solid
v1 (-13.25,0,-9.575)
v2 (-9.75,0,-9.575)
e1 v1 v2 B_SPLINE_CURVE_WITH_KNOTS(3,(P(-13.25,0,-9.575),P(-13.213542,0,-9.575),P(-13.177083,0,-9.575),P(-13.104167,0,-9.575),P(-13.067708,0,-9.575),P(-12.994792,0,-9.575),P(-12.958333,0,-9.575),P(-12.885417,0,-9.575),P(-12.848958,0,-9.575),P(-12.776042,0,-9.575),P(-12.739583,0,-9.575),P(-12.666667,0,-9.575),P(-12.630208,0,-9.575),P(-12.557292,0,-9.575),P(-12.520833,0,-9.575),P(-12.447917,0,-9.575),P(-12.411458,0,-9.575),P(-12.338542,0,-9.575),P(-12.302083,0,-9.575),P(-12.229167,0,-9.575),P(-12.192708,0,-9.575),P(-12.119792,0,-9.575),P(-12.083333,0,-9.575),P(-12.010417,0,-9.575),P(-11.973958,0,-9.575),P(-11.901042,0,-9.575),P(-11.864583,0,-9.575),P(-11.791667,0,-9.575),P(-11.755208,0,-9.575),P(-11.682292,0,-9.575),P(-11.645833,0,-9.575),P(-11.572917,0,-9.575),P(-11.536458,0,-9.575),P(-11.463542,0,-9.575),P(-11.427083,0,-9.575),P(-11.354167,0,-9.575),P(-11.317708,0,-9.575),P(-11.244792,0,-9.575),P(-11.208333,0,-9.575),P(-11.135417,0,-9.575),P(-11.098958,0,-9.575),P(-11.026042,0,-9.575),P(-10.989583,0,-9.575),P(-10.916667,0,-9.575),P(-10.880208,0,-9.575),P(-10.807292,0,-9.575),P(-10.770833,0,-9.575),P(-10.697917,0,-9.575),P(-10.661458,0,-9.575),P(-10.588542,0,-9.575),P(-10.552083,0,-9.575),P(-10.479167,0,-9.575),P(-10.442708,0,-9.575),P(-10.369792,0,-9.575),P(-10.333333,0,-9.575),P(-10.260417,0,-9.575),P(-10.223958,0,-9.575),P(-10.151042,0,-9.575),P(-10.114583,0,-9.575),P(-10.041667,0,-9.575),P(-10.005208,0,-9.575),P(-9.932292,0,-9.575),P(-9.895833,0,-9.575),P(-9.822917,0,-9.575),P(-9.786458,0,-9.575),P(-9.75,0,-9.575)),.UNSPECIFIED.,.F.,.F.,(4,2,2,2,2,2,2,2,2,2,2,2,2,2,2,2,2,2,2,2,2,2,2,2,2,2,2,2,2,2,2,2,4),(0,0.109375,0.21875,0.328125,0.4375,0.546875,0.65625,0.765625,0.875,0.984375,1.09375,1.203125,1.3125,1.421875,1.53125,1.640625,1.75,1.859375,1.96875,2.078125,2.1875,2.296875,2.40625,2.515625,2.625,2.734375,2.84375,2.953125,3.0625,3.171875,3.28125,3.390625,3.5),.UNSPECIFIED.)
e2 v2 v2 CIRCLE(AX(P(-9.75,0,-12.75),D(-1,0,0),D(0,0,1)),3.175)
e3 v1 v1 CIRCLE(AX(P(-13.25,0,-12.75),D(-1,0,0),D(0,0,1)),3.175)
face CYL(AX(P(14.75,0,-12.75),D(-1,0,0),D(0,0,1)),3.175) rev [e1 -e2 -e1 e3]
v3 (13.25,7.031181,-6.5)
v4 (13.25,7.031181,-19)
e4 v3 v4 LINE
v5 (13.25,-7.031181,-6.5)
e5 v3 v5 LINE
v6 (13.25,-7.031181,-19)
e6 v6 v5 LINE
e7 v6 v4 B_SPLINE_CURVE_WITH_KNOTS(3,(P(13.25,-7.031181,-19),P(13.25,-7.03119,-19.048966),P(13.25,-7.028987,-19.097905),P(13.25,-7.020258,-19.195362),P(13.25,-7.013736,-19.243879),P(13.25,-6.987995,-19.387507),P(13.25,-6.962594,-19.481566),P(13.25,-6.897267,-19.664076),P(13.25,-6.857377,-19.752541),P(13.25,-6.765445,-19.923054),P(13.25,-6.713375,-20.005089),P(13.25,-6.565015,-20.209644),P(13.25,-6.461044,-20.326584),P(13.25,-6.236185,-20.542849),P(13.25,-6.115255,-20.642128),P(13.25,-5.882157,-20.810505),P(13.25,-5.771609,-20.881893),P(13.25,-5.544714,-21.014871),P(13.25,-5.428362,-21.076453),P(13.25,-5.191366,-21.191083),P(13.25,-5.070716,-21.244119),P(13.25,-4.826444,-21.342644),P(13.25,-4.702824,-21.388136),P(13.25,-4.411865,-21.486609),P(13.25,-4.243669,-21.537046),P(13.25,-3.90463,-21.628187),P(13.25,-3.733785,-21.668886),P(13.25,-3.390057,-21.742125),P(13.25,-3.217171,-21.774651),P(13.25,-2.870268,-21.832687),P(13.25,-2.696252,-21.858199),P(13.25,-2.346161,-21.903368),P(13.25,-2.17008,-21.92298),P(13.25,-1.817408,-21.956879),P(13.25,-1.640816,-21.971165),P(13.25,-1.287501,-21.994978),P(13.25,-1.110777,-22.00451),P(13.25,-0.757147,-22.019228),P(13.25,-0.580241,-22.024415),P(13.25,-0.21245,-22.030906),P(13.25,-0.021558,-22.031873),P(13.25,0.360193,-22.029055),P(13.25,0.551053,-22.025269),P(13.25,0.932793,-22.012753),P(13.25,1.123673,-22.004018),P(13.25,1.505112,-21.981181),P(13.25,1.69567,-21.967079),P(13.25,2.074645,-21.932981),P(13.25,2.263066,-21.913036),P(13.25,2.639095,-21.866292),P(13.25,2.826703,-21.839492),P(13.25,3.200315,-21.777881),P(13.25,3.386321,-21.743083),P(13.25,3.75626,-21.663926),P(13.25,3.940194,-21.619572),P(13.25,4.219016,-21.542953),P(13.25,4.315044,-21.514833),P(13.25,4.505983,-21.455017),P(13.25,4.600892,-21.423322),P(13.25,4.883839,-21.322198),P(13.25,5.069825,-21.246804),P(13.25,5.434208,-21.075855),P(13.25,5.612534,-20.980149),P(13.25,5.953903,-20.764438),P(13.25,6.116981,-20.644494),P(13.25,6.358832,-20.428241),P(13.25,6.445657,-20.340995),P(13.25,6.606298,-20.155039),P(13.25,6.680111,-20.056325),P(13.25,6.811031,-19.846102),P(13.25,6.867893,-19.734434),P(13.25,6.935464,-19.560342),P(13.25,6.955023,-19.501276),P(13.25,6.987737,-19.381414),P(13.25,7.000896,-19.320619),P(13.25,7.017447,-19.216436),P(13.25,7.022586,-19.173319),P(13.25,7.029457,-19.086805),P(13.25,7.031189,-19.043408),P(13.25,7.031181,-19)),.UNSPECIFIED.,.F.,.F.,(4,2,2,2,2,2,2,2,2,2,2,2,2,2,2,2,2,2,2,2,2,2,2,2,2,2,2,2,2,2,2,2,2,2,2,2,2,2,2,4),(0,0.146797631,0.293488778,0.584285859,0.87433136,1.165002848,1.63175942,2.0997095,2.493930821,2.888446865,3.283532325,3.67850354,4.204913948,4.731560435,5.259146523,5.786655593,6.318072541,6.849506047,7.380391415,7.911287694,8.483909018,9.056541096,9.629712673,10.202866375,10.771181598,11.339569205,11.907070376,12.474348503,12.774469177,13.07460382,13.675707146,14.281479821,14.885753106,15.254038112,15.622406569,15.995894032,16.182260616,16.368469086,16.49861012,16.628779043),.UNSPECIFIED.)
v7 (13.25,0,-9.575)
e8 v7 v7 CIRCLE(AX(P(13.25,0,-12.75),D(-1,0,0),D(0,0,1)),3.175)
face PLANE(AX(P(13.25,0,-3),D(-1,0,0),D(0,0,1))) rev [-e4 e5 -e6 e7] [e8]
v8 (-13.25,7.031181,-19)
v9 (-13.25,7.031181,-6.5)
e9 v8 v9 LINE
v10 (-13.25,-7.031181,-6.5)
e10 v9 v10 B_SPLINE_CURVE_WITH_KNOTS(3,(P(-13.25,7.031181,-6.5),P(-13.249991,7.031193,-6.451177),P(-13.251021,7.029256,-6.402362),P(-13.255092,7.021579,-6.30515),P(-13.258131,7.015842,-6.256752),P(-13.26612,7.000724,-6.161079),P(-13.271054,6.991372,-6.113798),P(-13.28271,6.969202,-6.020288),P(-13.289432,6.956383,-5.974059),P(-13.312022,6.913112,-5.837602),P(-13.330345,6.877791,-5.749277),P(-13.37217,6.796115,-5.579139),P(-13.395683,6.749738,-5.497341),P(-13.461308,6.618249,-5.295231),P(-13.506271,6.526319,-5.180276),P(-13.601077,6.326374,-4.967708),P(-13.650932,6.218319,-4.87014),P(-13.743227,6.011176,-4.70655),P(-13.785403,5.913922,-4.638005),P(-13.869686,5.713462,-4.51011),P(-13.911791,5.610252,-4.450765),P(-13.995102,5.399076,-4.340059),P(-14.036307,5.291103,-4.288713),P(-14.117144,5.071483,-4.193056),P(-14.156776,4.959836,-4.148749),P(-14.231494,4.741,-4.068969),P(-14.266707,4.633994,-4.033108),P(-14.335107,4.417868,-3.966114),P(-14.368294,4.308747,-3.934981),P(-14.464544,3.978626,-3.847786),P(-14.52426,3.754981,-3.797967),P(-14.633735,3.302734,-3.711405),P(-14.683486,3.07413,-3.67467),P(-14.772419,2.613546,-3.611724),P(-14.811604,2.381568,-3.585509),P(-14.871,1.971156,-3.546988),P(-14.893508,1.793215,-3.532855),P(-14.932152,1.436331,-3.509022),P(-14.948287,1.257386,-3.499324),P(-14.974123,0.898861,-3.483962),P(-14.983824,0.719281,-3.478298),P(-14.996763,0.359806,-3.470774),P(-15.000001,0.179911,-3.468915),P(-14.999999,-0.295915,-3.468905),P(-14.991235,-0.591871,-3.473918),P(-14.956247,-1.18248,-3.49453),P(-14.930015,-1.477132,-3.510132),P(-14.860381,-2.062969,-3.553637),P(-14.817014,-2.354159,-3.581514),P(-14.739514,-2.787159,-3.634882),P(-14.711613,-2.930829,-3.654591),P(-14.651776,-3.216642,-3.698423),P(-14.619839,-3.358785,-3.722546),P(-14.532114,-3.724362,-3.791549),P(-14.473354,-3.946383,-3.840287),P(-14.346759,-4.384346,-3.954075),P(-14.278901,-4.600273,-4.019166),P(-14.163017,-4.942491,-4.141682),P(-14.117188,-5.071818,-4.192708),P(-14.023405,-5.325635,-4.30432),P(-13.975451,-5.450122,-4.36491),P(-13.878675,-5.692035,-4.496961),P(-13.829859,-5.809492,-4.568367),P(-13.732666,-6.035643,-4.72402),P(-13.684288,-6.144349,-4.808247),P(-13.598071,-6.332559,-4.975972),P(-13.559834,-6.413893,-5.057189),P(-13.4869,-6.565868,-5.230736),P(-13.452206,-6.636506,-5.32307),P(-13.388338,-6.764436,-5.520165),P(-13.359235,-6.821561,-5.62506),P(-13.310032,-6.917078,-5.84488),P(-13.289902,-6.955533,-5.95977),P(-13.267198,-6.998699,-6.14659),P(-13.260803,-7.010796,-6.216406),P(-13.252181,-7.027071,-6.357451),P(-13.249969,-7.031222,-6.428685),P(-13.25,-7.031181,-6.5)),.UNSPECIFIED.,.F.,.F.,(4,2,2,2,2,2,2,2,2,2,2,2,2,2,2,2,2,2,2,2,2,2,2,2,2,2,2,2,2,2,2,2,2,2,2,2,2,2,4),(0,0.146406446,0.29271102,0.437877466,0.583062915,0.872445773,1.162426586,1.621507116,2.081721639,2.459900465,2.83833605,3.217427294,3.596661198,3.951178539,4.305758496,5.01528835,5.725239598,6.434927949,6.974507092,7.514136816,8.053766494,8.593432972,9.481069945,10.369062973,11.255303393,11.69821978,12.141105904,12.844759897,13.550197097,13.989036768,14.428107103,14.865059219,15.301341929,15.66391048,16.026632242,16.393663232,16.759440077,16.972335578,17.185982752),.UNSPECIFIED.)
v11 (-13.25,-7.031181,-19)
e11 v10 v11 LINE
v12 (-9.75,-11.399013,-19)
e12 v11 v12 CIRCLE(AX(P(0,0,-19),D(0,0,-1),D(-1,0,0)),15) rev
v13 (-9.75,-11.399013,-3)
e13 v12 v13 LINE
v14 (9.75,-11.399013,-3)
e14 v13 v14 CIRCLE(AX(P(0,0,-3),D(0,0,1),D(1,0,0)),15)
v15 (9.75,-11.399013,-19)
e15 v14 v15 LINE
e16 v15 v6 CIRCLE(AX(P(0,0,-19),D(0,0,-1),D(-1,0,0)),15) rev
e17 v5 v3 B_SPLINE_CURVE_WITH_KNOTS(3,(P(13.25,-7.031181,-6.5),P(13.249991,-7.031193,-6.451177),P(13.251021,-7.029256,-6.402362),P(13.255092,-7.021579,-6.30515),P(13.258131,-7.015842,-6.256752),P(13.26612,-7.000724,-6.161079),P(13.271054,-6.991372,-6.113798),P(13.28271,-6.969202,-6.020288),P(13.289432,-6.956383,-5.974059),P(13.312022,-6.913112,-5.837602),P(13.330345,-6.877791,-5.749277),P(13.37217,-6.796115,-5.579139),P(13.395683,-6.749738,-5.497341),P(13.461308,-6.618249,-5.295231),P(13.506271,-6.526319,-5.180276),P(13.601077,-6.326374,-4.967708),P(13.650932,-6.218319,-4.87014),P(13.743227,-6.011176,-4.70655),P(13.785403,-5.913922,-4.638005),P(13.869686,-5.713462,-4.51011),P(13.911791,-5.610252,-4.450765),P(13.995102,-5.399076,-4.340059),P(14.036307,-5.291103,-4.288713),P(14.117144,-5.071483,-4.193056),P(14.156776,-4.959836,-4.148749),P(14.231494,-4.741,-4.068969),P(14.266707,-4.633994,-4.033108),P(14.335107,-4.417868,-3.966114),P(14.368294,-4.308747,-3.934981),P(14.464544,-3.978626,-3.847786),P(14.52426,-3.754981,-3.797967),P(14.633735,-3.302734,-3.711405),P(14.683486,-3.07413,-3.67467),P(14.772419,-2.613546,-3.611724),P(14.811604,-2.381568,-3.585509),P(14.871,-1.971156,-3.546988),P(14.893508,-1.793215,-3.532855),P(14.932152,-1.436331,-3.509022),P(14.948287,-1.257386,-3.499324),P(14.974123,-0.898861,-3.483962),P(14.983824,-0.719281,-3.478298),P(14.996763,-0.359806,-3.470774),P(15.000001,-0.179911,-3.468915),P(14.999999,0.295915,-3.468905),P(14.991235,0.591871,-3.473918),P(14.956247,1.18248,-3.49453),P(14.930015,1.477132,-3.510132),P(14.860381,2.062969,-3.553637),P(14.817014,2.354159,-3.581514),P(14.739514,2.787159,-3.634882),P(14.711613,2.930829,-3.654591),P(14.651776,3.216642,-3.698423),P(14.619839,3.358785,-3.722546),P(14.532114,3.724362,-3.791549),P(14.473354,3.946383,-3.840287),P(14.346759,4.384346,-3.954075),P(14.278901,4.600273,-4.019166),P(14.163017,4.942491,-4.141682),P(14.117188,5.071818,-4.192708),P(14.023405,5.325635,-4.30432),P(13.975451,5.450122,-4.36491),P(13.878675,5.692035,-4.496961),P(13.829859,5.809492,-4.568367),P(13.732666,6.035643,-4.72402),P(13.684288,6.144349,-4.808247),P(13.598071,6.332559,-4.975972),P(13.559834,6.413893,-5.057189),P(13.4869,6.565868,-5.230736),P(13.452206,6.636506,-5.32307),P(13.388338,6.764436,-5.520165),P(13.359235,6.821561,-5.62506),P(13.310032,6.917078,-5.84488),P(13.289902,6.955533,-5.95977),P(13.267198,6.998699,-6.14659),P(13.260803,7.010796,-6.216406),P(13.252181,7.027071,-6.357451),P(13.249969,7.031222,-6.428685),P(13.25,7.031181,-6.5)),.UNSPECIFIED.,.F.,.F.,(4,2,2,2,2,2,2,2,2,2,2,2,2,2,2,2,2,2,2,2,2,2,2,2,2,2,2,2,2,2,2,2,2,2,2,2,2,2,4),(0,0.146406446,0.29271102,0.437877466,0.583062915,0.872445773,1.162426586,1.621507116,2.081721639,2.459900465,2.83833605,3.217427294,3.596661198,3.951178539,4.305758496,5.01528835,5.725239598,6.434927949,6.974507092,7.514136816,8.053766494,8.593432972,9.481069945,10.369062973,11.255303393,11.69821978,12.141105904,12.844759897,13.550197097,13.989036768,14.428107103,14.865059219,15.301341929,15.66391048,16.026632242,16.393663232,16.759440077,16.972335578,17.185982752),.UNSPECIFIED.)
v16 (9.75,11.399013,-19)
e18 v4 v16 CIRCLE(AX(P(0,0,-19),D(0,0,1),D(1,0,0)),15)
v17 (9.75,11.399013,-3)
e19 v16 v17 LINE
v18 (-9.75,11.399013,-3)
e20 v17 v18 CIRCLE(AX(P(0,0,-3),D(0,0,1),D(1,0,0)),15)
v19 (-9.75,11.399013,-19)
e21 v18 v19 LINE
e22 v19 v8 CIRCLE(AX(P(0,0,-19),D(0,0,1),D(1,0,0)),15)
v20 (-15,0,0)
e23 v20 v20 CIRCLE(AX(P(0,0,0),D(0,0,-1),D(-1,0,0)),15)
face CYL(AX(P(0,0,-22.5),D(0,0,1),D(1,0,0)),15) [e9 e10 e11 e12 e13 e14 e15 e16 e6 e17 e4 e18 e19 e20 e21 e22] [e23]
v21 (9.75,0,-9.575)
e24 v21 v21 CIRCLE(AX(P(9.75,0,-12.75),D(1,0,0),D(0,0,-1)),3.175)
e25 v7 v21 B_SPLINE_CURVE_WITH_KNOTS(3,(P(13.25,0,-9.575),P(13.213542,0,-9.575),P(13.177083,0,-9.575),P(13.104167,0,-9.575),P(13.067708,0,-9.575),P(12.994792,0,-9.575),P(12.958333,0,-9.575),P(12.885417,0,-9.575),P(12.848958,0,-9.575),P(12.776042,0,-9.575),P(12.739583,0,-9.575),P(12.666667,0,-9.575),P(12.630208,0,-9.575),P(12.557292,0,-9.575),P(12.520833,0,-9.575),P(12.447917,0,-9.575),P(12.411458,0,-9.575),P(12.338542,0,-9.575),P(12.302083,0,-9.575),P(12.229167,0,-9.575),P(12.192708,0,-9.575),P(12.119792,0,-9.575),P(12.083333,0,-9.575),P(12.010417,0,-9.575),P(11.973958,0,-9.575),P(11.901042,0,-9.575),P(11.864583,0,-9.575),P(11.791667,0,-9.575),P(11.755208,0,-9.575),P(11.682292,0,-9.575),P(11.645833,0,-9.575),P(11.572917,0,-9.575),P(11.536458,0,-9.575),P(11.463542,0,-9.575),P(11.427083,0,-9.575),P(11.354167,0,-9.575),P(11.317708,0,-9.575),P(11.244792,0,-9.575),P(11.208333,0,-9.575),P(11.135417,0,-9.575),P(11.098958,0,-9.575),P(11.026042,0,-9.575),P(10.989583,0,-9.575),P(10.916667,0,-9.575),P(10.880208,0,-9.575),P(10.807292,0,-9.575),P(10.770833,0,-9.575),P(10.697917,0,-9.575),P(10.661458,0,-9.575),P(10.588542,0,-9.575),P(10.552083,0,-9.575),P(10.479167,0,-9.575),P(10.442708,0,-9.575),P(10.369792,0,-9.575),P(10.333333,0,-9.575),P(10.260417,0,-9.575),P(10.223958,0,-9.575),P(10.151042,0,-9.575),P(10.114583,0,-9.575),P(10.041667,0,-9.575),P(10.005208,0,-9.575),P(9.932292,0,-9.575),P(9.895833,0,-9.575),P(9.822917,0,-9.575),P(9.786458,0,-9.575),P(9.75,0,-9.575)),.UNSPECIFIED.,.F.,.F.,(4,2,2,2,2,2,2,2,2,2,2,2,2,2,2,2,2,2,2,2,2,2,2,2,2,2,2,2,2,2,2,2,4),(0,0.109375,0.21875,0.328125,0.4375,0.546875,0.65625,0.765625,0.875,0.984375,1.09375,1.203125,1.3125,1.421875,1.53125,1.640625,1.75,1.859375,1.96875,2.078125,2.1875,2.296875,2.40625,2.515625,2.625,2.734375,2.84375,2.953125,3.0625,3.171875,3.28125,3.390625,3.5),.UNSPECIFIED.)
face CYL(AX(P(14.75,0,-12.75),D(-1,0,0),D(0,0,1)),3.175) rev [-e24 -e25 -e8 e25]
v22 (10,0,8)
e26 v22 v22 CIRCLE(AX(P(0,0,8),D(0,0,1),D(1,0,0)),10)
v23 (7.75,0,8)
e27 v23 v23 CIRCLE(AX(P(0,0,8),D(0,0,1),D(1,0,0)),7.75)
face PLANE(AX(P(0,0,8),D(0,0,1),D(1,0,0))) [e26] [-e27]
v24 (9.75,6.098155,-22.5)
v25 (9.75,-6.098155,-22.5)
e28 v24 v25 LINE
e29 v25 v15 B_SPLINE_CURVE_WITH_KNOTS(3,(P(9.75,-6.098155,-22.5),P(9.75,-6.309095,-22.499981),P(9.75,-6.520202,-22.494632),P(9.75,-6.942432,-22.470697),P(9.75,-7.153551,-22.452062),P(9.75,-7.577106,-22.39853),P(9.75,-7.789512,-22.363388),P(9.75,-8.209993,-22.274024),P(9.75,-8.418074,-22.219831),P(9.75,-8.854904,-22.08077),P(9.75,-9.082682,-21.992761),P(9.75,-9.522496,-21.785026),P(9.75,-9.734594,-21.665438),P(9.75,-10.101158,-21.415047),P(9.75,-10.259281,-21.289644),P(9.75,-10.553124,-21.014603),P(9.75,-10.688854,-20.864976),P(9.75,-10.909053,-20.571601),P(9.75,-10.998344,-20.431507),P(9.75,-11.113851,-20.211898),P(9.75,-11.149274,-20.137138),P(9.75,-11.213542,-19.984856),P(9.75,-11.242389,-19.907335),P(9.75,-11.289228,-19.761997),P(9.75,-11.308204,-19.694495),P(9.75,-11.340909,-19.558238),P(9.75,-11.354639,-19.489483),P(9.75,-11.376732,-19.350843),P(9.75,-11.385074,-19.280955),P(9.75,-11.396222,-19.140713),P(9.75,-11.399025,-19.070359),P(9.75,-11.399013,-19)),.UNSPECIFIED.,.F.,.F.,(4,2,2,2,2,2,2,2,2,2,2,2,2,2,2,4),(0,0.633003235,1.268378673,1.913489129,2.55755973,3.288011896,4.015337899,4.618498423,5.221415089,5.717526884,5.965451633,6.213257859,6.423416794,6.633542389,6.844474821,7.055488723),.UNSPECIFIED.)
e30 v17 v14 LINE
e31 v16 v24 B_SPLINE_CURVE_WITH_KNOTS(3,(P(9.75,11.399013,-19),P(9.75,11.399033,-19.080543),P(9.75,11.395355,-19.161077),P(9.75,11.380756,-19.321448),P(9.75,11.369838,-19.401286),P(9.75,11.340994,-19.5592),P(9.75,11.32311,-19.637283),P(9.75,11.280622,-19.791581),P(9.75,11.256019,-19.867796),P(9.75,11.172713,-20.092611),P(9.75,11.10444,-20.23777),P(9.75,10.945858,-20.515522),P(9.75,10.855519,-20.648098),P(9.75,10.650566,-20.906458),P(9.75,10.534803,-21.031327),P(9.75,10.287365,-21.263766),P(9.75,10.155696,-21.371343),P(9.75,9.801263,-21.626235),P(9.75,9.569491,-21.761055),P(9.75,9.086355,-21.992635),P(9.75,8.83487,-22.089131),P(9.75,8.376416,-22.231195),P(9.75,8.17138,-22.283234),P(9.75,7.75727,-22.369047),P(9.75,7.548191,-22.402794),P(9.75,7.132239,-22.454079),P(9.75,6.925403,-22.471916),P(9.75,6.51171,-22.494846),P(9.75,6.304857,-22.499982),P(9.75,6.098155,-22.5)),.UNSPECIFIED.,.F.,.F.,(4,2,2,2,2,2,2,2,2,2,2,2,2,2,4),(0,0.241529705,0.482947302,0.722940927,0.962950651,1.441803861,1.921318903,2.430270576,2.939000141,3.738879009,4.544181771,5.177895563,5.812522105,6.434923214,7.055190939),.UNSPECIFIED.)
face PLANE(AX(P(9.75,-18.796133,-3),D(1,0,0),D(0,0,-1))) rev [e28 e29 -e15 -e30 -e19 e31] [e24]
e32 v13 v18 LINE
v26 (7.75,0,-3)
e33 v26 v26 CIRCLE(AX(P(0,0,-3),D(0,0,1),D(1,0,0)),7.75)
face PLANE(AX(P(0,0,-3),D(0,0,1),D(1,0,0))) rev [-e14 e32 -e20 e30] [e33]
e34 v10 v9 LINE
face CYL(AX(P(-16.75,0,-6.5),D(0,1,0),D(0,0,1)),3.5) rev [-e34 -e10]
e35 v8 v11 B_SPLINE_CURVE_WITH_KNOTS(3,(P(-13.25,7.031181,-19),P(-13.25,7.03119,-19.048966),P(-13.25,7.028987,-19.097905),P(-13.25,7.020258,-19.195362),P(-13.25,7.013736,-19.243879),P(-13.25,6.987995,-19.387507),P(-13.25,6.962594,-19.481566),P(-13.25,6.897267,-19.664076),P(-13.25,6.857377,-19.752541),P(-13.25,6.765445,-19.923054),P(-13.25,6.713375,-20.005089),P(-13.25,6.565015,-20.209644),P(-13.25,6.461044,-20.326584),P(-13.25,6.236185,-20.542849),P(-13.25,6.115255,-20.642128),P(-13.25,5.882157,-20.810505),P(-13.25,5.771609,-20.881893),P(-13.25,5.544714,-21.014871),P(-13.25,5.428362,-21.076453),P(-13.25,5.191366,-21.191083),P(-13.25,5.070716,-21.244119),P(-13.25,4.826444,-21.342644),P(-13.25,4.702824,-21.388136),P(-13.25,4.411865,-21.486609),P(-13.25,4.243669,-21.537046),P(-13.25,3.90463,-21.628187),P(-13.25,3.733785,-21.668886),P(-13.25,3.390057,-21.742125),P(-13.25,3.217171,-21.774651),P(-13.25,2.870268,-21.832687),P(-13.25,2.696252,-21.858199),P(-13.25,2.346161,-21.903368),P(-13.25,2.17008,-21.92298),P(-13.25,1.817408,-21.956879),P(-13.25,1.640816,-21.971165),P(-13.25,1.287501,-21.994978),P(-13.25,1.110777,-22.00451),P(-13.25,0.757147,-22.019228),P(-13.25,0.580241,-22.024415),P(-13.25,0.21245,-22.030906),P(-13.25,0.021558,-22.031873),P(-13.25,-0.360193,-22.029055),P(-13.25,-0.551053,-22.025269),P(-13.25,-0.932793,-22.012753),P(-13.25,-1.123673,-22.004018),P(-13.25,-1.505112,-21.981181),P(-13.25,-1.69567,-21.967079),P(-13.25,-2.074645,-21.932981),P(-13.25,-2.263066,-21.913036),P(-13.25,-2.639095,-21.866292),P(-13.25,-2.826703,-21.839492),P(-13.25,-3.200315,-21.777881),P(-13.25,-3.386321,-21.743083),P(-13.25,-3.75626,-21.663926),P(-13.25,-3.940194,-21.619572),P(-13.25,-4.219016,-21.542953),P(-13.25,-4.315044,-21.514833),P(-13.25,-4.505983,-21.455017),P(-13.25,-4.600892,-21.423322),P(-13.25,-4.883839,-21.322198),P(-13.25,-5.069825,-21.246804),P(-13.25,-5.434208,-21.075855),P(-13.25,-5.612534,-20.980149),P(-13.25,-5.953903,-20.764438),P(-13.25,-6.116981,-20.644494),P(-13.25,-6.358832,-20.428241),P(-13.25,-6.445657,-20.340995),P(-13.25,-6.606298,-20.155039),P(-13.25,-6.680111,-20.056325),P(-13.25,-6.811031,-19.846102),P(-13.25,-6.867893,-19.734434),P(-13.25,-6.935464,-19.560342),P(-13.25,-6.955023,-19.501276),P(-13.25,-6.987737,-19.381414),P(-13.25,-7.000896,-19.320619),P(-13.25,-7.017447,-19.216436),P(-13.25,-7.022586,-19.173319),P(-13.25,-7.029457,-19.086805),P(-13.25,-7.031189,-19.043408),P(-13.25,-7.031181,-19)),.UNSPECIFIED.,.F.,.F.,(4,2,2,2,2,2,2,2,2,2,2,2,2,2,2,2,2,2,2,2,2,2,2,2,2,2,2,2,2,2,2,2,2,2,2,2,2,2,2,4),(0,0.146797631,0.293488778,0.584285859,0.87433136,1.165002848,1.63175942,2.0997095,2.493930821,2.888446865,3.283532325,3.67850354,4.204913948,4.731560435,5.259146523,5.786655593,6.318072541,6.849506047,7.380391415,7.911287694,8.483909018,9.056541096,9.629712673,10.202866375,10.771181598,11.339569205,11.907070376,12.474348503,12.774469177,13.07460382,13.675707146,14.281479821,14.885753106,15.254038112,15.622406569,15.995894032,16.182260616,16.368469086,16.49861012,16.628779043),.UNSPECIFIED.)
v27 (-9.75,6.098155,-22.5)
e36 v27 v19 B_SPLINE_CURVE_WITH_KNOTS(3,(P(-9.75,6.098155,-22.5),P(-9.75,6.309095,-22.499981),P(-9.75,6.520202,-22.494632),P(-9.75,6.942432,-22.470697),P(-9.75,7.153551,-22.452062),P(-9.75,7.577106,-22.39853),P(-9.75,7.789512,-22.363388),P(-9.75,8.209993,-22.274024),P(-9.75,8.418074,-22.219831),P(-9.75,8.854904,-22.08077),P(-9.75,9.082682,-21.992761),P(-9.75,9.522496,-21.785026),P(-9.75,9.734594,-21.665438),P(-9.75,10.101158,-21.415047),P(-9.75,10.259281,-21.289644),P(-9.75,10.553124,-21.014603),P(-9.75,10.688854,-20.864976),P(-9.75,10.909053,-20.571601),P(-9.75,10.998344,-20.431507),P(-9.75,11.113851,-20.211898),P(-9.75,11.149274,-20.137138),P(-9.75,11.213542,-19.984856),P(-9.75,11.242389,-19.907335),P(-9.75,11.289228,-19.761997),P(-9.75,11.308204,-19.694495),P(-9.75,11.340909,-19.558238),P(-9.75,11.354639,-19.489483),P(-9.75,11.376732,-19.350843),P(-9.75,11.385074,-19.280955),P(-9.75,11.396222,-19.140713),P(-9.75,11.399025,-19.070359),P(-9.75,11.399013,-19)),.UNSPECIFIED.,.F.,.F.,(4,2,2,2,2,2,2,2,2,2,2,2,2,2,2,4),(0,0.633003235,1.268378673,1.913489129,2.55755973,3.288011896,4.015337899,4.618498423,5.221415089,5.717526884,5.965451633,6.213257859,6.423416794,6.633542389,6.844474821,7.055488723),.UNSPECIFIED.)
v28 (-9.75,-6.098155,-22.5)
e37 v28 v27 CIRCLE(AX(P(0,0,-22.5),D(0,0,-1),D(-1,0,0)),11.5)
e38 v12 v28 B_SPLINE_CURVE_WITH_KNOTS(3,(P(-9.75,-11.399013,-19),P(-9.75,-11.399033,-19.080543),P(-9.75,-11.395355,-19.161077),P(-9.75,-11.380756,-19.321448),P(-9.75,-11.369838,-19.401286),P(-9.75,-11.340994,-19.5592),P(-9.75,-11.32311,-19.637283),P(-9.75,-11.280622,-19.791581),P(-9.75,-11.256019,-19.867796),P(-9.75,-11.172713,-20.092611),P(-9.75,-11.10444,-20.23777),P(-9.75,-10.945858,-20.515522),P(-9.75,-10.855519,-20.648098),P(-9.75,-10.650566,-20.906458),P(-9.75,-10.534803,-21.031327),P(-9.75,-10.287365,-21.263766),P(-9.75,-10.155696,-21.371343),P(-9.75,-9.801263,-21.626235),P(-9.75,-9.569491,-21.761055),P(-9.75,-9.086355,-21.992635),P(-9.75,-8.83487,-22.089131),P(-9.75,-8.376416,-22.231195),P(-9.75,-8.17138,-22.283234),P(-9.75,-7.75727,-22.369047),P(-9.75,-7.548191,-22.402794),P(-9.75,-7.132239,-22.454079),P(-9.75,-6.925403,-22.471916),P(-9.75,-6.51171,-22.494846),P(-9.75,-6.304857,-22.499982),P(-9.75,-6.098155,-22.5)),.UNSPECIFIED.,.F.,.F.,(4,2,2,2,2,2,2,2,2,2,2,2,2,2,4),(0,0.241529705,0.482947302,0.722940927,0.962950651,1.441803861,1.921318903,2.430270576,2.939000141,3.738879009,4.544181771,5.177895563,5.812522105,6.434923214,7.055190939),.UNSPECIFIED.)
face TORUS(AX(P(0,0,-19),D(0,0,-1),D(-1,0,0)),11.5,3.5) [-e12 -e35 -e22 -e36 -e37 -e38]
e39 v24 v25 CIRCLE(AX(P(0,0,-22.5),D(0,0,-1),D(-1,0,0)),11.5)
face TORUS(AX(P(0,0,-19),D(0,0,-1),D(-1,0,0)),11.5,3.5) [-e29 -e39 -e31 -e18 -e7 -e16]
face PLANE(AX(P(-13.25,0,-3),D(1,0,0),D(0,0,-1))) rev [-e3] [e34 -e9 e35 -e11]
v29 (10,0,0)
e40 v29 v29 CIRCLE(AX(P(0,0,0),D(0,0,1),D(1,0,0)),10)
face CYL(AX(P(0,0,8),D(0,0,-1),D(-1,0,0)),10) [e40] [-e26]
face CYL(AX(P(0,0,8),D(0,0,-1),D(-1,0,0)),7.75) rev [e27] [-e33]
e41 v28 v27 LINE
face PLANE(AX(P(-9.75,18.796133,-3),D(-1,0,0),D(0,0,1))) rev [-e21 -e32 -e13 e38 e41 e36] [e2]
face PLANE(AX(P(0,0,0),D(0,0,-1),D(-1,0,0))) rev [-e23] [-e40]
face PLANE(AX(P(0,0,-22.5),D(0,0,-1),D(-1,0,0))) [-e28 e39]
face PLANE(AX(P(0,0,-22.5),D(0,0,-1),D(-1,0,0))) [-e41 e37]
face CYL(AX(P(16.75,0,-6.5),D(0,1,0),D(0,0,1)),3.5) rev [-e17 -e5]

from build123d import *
from build123d.topology import SkipClean

# Parameters (mm, degrees)
SKETCH1_R           = 10
SKETCH1_R_2         = 7.75
BOSS_EXTRUDE1_DEPTH = 8
BOSS_EXTRUDE2_START = 22.5
SKETCH2_R           = 15
SKETCH2_R_2         = 7.75
BOSS_EXTRUDE2_DEPTH = 22.5
CUT_EXTRUDE1_DEPTH  = 19.5
CUT_EXTRUDE2_DEPTH  = 19.5
FILLET2_R           = 3.5
FILLET3_R           = 3.5
SKETCH5_R           = 3.175
CUT_EXTRUDE3_DEPTH  = 28


with BuildPart() as part:
    # Sketch1 → Boss-Extrude1 (new body)
    with BuildSketch(Plane.XY):
        Circle(SKETCH1_R)
        Circle(SKETCH1_R_2, mode=Mode.SUBTRACT)
    extrude(amount=BOSS_EXTRUDE1_DEPTH)

    # Sketch2 → Boss-Extrude2 (add)
    with SkipClean():  # the faces are left unmerged after this step: merging them gives an invalid solid
        with BuildSketch(Plane(origin=(0, 0, 0), x_dir=(-1, 0, 0), z_dir=(0, 0, -1)).offset(BOSS_EXTRUDE2_START)):
            with Locations(Location((0, 0, 0), (0, 0, 180))):
                Circle(SKETCH2_R)
            Circle(SKETCH2_R_2, mode=Mode.SUBTRACT)
        extrude(amount=-BOSS_EXTRUDE2_DEPTH)

    # Sketch3 → Cut-Extrude1 (cut)
    with SkipClean():  # the faces are left unmerged after this step: merging them gives an invalid solid
        with BuildSketch(Plane(origin=(0, 0, -22.5), x_dir=(-1, 0, 0), z_dir=(0, 0, -1))):
            Polygon((-9.75, -18.796133084), (-9.75, 18.796133084), (9.75, 18.796133084), (9.75, -18.796133084), (7.75, -18.796133084), align=None)
        extrude(amount=-CUT_EXTRUDE1_DEPTH, mode=Mode.SUBTRACT)

    # Sketch4 → Cut-Extrude2 (cut)
    with SkipClean():  # the faces are left unmerged after this step: merging them gives an invalid solid
        with BuildSketch(Plane(origin=(0, 0, -22.5), x_dir=(-1, 0, 0), z_dir=(0, 0, -1))):
            Polygon((13.25, 0), (13.25, 9.875321844), (16.822314813, 9.875321844), (16.822314813, -10.062236453), (13.25, -10.062236453), align=None)
            Polygon((-13.25, 0), (-13.25, 9.875321844), (-16.946924552, 9.875321844), (-16.946924552, -10.062236453), (-13.25, -10.062236453), align=None)
        extrude(amount=-CUT_EXTRUDE2_DEPTH, mode=Mode.SUBTRACT)

    # Fillet2
    # the kernel refuses this fillet: 3.5 mm, written as the material it takes off along each edge
    with BuildSketch(Plane(origin=(0, 0, -22.5), x_dir=(-0.9954455514226321, -0.09533181081303158, 0), z_dir=(0.09533181081303158, -0.9954455514226321, 0))) as fillet2_piece_1:
        with BuildLine():
            CenterArc((15 - FILLET2_R, -FILLET2_R), FILLET2_R, 0, 90)
            Line((15 - FILLET2_R, 0), (15, 0))
            Line((15, 0), (15, -FILLET2_R))
        make_face()
    revolve(axis=Axis((0, 0, -22.5), (0, 0, -1)), revolution_arc=88.352120415, mode=Mode.SUBTRACT)
    with BuildSketch(Plane(origin=(0, 0, -22.5), x_dir=(-0.12391837211536041, -0.9922924150935948, 0), z_dir=(0.9922924150935948, -0.12391837211536041, 0))) as fillet2_piece_2:
        with BuildLine():
            CenterArc((15 - FILLET2_R, -FILLET2_R), FILLET2_R, 0, 90)
            Line((15 - FILLET2_R, 0), (15, 0))
            Line((15, 0), (15, -FILLET2_R))
        make_face()
    revolve(axis=Axis((0, 0, -22.5), (0, 0, -1)), revolution_arc=88.352120415, mode=Mode.SUBTRACT)
    with BuildSketch(Plane(origin=(0, 0, -22.5), x_dir=(0.9954455514226316, 0.09533181081303897, 0), z_dir=(-0.09533181081303897, 0.9954455514226316, 0))) as fillet2_piece_3:
        with BuildLine():
            CenterArc((15 - FILLET2_R, -FILLET2_R), FILLET2_R, 0, 90)
            Line((15 - FILLET2_R, 0), (15, 0))
            Line((15, 0), (15, -FILLET2_R))
        make_face()
    revolve(axis=Axis((0, 0, -22.5), (0, 0, -1)), revolution_arc=88.352120415, mode=Mode.SUBTRACT)
    with BuildSketch(Plane(origin=(0, 0, -22.5), x_dir=(0.12391837211539843, 0.9922924150935901, 0), z_dir=(-0.9922924150935901, 0.12391837211539843, 0))) as fillet2_piece_4:
        with BuildLine():
            CenterArc((15 - FILLET2_R, -FILLET2_R), FILLET2_R, 0, 90)
            Line((15 - FILLET2_R, 0), (15, 0))
            Line((15, 0), (15, -FILLET2_R))
        make_face()
    revolve(axis=Axis((0, 0, -22.5), (0, 0, -1)), revolution_arc=88.352120415, mode=Mode.SUBTRACT)

    # Fillet3
    # the kernel refuses this fillet: 3.5 mm, written as the material it adds along each edge
    with BuildSketch(Plane(origin=(13.25, -15.781180555, -3), x_dir=(0, 0, -1), z_dir=(0, 1, 0))) as fillet3_piece_1_section:
        with BuildLine():
            CenterArc((FILLET3_R, -FILLET3_R), FILLET3_R, 90, 90)
            Line((0, -FILLET3_R), (0, 0))
            Line((0, 0), (FILLET3_R, 0))
        make_face()
    fillet3_piece_1 = extrude(amount=31.56236111, mode=Mode.PRIVATE)
    fillet3_piece_1 = fillet3_piece_1 & Plane(origin=(0, 0, -3.991170141), x_dir=(1, 0, 0), z_dir=(0, 0, -1)) * Cylinder(15, 78, mode=Mode.PRIVATE)
    add(fillet3_piece_1)
    with BuildSketch(Plane(origin=(-13.25, 15.781180555, -3), x_dir=(0, 0, -1), z_dir=(0, -1, 0))) as fillet3_piece_2_section:
        with BuildLine():
            CenterArc((FILLET3_R, -FILLET3_R), FILLET3_R, 90, 90)
            Line((0, -FILLET3_R), (0, 0))
            Line((0, 0), (FILLET3_R, 0))
        make_face()
    fillet3_piece_2 = extrude(amount=31.56236111, mode=Mode.PRIVATE)
    fillet3_piece_2 = fillet3_piece_2 & Plane(origin=(0, 0, -3.991154317), x_dir=(1, 0, 0), z_dir=(0, 0, -1)) * Cylinder(15, 78, mode=Mode.PRIVATE)
    add(fillet3_piece_2)

    # Sketch5 → Cut-Extrude3 (cut)
    with BuildSketch(Plane.ZY.offset(13.25)):
        with Locations((-12.749999996, 0)):
            Circle(SKETCH5_R)
    extrude(amount=-CUT_EXTRUDE3_DEPTH, mode=Mode.SUBTRACT)


solid = part.part
